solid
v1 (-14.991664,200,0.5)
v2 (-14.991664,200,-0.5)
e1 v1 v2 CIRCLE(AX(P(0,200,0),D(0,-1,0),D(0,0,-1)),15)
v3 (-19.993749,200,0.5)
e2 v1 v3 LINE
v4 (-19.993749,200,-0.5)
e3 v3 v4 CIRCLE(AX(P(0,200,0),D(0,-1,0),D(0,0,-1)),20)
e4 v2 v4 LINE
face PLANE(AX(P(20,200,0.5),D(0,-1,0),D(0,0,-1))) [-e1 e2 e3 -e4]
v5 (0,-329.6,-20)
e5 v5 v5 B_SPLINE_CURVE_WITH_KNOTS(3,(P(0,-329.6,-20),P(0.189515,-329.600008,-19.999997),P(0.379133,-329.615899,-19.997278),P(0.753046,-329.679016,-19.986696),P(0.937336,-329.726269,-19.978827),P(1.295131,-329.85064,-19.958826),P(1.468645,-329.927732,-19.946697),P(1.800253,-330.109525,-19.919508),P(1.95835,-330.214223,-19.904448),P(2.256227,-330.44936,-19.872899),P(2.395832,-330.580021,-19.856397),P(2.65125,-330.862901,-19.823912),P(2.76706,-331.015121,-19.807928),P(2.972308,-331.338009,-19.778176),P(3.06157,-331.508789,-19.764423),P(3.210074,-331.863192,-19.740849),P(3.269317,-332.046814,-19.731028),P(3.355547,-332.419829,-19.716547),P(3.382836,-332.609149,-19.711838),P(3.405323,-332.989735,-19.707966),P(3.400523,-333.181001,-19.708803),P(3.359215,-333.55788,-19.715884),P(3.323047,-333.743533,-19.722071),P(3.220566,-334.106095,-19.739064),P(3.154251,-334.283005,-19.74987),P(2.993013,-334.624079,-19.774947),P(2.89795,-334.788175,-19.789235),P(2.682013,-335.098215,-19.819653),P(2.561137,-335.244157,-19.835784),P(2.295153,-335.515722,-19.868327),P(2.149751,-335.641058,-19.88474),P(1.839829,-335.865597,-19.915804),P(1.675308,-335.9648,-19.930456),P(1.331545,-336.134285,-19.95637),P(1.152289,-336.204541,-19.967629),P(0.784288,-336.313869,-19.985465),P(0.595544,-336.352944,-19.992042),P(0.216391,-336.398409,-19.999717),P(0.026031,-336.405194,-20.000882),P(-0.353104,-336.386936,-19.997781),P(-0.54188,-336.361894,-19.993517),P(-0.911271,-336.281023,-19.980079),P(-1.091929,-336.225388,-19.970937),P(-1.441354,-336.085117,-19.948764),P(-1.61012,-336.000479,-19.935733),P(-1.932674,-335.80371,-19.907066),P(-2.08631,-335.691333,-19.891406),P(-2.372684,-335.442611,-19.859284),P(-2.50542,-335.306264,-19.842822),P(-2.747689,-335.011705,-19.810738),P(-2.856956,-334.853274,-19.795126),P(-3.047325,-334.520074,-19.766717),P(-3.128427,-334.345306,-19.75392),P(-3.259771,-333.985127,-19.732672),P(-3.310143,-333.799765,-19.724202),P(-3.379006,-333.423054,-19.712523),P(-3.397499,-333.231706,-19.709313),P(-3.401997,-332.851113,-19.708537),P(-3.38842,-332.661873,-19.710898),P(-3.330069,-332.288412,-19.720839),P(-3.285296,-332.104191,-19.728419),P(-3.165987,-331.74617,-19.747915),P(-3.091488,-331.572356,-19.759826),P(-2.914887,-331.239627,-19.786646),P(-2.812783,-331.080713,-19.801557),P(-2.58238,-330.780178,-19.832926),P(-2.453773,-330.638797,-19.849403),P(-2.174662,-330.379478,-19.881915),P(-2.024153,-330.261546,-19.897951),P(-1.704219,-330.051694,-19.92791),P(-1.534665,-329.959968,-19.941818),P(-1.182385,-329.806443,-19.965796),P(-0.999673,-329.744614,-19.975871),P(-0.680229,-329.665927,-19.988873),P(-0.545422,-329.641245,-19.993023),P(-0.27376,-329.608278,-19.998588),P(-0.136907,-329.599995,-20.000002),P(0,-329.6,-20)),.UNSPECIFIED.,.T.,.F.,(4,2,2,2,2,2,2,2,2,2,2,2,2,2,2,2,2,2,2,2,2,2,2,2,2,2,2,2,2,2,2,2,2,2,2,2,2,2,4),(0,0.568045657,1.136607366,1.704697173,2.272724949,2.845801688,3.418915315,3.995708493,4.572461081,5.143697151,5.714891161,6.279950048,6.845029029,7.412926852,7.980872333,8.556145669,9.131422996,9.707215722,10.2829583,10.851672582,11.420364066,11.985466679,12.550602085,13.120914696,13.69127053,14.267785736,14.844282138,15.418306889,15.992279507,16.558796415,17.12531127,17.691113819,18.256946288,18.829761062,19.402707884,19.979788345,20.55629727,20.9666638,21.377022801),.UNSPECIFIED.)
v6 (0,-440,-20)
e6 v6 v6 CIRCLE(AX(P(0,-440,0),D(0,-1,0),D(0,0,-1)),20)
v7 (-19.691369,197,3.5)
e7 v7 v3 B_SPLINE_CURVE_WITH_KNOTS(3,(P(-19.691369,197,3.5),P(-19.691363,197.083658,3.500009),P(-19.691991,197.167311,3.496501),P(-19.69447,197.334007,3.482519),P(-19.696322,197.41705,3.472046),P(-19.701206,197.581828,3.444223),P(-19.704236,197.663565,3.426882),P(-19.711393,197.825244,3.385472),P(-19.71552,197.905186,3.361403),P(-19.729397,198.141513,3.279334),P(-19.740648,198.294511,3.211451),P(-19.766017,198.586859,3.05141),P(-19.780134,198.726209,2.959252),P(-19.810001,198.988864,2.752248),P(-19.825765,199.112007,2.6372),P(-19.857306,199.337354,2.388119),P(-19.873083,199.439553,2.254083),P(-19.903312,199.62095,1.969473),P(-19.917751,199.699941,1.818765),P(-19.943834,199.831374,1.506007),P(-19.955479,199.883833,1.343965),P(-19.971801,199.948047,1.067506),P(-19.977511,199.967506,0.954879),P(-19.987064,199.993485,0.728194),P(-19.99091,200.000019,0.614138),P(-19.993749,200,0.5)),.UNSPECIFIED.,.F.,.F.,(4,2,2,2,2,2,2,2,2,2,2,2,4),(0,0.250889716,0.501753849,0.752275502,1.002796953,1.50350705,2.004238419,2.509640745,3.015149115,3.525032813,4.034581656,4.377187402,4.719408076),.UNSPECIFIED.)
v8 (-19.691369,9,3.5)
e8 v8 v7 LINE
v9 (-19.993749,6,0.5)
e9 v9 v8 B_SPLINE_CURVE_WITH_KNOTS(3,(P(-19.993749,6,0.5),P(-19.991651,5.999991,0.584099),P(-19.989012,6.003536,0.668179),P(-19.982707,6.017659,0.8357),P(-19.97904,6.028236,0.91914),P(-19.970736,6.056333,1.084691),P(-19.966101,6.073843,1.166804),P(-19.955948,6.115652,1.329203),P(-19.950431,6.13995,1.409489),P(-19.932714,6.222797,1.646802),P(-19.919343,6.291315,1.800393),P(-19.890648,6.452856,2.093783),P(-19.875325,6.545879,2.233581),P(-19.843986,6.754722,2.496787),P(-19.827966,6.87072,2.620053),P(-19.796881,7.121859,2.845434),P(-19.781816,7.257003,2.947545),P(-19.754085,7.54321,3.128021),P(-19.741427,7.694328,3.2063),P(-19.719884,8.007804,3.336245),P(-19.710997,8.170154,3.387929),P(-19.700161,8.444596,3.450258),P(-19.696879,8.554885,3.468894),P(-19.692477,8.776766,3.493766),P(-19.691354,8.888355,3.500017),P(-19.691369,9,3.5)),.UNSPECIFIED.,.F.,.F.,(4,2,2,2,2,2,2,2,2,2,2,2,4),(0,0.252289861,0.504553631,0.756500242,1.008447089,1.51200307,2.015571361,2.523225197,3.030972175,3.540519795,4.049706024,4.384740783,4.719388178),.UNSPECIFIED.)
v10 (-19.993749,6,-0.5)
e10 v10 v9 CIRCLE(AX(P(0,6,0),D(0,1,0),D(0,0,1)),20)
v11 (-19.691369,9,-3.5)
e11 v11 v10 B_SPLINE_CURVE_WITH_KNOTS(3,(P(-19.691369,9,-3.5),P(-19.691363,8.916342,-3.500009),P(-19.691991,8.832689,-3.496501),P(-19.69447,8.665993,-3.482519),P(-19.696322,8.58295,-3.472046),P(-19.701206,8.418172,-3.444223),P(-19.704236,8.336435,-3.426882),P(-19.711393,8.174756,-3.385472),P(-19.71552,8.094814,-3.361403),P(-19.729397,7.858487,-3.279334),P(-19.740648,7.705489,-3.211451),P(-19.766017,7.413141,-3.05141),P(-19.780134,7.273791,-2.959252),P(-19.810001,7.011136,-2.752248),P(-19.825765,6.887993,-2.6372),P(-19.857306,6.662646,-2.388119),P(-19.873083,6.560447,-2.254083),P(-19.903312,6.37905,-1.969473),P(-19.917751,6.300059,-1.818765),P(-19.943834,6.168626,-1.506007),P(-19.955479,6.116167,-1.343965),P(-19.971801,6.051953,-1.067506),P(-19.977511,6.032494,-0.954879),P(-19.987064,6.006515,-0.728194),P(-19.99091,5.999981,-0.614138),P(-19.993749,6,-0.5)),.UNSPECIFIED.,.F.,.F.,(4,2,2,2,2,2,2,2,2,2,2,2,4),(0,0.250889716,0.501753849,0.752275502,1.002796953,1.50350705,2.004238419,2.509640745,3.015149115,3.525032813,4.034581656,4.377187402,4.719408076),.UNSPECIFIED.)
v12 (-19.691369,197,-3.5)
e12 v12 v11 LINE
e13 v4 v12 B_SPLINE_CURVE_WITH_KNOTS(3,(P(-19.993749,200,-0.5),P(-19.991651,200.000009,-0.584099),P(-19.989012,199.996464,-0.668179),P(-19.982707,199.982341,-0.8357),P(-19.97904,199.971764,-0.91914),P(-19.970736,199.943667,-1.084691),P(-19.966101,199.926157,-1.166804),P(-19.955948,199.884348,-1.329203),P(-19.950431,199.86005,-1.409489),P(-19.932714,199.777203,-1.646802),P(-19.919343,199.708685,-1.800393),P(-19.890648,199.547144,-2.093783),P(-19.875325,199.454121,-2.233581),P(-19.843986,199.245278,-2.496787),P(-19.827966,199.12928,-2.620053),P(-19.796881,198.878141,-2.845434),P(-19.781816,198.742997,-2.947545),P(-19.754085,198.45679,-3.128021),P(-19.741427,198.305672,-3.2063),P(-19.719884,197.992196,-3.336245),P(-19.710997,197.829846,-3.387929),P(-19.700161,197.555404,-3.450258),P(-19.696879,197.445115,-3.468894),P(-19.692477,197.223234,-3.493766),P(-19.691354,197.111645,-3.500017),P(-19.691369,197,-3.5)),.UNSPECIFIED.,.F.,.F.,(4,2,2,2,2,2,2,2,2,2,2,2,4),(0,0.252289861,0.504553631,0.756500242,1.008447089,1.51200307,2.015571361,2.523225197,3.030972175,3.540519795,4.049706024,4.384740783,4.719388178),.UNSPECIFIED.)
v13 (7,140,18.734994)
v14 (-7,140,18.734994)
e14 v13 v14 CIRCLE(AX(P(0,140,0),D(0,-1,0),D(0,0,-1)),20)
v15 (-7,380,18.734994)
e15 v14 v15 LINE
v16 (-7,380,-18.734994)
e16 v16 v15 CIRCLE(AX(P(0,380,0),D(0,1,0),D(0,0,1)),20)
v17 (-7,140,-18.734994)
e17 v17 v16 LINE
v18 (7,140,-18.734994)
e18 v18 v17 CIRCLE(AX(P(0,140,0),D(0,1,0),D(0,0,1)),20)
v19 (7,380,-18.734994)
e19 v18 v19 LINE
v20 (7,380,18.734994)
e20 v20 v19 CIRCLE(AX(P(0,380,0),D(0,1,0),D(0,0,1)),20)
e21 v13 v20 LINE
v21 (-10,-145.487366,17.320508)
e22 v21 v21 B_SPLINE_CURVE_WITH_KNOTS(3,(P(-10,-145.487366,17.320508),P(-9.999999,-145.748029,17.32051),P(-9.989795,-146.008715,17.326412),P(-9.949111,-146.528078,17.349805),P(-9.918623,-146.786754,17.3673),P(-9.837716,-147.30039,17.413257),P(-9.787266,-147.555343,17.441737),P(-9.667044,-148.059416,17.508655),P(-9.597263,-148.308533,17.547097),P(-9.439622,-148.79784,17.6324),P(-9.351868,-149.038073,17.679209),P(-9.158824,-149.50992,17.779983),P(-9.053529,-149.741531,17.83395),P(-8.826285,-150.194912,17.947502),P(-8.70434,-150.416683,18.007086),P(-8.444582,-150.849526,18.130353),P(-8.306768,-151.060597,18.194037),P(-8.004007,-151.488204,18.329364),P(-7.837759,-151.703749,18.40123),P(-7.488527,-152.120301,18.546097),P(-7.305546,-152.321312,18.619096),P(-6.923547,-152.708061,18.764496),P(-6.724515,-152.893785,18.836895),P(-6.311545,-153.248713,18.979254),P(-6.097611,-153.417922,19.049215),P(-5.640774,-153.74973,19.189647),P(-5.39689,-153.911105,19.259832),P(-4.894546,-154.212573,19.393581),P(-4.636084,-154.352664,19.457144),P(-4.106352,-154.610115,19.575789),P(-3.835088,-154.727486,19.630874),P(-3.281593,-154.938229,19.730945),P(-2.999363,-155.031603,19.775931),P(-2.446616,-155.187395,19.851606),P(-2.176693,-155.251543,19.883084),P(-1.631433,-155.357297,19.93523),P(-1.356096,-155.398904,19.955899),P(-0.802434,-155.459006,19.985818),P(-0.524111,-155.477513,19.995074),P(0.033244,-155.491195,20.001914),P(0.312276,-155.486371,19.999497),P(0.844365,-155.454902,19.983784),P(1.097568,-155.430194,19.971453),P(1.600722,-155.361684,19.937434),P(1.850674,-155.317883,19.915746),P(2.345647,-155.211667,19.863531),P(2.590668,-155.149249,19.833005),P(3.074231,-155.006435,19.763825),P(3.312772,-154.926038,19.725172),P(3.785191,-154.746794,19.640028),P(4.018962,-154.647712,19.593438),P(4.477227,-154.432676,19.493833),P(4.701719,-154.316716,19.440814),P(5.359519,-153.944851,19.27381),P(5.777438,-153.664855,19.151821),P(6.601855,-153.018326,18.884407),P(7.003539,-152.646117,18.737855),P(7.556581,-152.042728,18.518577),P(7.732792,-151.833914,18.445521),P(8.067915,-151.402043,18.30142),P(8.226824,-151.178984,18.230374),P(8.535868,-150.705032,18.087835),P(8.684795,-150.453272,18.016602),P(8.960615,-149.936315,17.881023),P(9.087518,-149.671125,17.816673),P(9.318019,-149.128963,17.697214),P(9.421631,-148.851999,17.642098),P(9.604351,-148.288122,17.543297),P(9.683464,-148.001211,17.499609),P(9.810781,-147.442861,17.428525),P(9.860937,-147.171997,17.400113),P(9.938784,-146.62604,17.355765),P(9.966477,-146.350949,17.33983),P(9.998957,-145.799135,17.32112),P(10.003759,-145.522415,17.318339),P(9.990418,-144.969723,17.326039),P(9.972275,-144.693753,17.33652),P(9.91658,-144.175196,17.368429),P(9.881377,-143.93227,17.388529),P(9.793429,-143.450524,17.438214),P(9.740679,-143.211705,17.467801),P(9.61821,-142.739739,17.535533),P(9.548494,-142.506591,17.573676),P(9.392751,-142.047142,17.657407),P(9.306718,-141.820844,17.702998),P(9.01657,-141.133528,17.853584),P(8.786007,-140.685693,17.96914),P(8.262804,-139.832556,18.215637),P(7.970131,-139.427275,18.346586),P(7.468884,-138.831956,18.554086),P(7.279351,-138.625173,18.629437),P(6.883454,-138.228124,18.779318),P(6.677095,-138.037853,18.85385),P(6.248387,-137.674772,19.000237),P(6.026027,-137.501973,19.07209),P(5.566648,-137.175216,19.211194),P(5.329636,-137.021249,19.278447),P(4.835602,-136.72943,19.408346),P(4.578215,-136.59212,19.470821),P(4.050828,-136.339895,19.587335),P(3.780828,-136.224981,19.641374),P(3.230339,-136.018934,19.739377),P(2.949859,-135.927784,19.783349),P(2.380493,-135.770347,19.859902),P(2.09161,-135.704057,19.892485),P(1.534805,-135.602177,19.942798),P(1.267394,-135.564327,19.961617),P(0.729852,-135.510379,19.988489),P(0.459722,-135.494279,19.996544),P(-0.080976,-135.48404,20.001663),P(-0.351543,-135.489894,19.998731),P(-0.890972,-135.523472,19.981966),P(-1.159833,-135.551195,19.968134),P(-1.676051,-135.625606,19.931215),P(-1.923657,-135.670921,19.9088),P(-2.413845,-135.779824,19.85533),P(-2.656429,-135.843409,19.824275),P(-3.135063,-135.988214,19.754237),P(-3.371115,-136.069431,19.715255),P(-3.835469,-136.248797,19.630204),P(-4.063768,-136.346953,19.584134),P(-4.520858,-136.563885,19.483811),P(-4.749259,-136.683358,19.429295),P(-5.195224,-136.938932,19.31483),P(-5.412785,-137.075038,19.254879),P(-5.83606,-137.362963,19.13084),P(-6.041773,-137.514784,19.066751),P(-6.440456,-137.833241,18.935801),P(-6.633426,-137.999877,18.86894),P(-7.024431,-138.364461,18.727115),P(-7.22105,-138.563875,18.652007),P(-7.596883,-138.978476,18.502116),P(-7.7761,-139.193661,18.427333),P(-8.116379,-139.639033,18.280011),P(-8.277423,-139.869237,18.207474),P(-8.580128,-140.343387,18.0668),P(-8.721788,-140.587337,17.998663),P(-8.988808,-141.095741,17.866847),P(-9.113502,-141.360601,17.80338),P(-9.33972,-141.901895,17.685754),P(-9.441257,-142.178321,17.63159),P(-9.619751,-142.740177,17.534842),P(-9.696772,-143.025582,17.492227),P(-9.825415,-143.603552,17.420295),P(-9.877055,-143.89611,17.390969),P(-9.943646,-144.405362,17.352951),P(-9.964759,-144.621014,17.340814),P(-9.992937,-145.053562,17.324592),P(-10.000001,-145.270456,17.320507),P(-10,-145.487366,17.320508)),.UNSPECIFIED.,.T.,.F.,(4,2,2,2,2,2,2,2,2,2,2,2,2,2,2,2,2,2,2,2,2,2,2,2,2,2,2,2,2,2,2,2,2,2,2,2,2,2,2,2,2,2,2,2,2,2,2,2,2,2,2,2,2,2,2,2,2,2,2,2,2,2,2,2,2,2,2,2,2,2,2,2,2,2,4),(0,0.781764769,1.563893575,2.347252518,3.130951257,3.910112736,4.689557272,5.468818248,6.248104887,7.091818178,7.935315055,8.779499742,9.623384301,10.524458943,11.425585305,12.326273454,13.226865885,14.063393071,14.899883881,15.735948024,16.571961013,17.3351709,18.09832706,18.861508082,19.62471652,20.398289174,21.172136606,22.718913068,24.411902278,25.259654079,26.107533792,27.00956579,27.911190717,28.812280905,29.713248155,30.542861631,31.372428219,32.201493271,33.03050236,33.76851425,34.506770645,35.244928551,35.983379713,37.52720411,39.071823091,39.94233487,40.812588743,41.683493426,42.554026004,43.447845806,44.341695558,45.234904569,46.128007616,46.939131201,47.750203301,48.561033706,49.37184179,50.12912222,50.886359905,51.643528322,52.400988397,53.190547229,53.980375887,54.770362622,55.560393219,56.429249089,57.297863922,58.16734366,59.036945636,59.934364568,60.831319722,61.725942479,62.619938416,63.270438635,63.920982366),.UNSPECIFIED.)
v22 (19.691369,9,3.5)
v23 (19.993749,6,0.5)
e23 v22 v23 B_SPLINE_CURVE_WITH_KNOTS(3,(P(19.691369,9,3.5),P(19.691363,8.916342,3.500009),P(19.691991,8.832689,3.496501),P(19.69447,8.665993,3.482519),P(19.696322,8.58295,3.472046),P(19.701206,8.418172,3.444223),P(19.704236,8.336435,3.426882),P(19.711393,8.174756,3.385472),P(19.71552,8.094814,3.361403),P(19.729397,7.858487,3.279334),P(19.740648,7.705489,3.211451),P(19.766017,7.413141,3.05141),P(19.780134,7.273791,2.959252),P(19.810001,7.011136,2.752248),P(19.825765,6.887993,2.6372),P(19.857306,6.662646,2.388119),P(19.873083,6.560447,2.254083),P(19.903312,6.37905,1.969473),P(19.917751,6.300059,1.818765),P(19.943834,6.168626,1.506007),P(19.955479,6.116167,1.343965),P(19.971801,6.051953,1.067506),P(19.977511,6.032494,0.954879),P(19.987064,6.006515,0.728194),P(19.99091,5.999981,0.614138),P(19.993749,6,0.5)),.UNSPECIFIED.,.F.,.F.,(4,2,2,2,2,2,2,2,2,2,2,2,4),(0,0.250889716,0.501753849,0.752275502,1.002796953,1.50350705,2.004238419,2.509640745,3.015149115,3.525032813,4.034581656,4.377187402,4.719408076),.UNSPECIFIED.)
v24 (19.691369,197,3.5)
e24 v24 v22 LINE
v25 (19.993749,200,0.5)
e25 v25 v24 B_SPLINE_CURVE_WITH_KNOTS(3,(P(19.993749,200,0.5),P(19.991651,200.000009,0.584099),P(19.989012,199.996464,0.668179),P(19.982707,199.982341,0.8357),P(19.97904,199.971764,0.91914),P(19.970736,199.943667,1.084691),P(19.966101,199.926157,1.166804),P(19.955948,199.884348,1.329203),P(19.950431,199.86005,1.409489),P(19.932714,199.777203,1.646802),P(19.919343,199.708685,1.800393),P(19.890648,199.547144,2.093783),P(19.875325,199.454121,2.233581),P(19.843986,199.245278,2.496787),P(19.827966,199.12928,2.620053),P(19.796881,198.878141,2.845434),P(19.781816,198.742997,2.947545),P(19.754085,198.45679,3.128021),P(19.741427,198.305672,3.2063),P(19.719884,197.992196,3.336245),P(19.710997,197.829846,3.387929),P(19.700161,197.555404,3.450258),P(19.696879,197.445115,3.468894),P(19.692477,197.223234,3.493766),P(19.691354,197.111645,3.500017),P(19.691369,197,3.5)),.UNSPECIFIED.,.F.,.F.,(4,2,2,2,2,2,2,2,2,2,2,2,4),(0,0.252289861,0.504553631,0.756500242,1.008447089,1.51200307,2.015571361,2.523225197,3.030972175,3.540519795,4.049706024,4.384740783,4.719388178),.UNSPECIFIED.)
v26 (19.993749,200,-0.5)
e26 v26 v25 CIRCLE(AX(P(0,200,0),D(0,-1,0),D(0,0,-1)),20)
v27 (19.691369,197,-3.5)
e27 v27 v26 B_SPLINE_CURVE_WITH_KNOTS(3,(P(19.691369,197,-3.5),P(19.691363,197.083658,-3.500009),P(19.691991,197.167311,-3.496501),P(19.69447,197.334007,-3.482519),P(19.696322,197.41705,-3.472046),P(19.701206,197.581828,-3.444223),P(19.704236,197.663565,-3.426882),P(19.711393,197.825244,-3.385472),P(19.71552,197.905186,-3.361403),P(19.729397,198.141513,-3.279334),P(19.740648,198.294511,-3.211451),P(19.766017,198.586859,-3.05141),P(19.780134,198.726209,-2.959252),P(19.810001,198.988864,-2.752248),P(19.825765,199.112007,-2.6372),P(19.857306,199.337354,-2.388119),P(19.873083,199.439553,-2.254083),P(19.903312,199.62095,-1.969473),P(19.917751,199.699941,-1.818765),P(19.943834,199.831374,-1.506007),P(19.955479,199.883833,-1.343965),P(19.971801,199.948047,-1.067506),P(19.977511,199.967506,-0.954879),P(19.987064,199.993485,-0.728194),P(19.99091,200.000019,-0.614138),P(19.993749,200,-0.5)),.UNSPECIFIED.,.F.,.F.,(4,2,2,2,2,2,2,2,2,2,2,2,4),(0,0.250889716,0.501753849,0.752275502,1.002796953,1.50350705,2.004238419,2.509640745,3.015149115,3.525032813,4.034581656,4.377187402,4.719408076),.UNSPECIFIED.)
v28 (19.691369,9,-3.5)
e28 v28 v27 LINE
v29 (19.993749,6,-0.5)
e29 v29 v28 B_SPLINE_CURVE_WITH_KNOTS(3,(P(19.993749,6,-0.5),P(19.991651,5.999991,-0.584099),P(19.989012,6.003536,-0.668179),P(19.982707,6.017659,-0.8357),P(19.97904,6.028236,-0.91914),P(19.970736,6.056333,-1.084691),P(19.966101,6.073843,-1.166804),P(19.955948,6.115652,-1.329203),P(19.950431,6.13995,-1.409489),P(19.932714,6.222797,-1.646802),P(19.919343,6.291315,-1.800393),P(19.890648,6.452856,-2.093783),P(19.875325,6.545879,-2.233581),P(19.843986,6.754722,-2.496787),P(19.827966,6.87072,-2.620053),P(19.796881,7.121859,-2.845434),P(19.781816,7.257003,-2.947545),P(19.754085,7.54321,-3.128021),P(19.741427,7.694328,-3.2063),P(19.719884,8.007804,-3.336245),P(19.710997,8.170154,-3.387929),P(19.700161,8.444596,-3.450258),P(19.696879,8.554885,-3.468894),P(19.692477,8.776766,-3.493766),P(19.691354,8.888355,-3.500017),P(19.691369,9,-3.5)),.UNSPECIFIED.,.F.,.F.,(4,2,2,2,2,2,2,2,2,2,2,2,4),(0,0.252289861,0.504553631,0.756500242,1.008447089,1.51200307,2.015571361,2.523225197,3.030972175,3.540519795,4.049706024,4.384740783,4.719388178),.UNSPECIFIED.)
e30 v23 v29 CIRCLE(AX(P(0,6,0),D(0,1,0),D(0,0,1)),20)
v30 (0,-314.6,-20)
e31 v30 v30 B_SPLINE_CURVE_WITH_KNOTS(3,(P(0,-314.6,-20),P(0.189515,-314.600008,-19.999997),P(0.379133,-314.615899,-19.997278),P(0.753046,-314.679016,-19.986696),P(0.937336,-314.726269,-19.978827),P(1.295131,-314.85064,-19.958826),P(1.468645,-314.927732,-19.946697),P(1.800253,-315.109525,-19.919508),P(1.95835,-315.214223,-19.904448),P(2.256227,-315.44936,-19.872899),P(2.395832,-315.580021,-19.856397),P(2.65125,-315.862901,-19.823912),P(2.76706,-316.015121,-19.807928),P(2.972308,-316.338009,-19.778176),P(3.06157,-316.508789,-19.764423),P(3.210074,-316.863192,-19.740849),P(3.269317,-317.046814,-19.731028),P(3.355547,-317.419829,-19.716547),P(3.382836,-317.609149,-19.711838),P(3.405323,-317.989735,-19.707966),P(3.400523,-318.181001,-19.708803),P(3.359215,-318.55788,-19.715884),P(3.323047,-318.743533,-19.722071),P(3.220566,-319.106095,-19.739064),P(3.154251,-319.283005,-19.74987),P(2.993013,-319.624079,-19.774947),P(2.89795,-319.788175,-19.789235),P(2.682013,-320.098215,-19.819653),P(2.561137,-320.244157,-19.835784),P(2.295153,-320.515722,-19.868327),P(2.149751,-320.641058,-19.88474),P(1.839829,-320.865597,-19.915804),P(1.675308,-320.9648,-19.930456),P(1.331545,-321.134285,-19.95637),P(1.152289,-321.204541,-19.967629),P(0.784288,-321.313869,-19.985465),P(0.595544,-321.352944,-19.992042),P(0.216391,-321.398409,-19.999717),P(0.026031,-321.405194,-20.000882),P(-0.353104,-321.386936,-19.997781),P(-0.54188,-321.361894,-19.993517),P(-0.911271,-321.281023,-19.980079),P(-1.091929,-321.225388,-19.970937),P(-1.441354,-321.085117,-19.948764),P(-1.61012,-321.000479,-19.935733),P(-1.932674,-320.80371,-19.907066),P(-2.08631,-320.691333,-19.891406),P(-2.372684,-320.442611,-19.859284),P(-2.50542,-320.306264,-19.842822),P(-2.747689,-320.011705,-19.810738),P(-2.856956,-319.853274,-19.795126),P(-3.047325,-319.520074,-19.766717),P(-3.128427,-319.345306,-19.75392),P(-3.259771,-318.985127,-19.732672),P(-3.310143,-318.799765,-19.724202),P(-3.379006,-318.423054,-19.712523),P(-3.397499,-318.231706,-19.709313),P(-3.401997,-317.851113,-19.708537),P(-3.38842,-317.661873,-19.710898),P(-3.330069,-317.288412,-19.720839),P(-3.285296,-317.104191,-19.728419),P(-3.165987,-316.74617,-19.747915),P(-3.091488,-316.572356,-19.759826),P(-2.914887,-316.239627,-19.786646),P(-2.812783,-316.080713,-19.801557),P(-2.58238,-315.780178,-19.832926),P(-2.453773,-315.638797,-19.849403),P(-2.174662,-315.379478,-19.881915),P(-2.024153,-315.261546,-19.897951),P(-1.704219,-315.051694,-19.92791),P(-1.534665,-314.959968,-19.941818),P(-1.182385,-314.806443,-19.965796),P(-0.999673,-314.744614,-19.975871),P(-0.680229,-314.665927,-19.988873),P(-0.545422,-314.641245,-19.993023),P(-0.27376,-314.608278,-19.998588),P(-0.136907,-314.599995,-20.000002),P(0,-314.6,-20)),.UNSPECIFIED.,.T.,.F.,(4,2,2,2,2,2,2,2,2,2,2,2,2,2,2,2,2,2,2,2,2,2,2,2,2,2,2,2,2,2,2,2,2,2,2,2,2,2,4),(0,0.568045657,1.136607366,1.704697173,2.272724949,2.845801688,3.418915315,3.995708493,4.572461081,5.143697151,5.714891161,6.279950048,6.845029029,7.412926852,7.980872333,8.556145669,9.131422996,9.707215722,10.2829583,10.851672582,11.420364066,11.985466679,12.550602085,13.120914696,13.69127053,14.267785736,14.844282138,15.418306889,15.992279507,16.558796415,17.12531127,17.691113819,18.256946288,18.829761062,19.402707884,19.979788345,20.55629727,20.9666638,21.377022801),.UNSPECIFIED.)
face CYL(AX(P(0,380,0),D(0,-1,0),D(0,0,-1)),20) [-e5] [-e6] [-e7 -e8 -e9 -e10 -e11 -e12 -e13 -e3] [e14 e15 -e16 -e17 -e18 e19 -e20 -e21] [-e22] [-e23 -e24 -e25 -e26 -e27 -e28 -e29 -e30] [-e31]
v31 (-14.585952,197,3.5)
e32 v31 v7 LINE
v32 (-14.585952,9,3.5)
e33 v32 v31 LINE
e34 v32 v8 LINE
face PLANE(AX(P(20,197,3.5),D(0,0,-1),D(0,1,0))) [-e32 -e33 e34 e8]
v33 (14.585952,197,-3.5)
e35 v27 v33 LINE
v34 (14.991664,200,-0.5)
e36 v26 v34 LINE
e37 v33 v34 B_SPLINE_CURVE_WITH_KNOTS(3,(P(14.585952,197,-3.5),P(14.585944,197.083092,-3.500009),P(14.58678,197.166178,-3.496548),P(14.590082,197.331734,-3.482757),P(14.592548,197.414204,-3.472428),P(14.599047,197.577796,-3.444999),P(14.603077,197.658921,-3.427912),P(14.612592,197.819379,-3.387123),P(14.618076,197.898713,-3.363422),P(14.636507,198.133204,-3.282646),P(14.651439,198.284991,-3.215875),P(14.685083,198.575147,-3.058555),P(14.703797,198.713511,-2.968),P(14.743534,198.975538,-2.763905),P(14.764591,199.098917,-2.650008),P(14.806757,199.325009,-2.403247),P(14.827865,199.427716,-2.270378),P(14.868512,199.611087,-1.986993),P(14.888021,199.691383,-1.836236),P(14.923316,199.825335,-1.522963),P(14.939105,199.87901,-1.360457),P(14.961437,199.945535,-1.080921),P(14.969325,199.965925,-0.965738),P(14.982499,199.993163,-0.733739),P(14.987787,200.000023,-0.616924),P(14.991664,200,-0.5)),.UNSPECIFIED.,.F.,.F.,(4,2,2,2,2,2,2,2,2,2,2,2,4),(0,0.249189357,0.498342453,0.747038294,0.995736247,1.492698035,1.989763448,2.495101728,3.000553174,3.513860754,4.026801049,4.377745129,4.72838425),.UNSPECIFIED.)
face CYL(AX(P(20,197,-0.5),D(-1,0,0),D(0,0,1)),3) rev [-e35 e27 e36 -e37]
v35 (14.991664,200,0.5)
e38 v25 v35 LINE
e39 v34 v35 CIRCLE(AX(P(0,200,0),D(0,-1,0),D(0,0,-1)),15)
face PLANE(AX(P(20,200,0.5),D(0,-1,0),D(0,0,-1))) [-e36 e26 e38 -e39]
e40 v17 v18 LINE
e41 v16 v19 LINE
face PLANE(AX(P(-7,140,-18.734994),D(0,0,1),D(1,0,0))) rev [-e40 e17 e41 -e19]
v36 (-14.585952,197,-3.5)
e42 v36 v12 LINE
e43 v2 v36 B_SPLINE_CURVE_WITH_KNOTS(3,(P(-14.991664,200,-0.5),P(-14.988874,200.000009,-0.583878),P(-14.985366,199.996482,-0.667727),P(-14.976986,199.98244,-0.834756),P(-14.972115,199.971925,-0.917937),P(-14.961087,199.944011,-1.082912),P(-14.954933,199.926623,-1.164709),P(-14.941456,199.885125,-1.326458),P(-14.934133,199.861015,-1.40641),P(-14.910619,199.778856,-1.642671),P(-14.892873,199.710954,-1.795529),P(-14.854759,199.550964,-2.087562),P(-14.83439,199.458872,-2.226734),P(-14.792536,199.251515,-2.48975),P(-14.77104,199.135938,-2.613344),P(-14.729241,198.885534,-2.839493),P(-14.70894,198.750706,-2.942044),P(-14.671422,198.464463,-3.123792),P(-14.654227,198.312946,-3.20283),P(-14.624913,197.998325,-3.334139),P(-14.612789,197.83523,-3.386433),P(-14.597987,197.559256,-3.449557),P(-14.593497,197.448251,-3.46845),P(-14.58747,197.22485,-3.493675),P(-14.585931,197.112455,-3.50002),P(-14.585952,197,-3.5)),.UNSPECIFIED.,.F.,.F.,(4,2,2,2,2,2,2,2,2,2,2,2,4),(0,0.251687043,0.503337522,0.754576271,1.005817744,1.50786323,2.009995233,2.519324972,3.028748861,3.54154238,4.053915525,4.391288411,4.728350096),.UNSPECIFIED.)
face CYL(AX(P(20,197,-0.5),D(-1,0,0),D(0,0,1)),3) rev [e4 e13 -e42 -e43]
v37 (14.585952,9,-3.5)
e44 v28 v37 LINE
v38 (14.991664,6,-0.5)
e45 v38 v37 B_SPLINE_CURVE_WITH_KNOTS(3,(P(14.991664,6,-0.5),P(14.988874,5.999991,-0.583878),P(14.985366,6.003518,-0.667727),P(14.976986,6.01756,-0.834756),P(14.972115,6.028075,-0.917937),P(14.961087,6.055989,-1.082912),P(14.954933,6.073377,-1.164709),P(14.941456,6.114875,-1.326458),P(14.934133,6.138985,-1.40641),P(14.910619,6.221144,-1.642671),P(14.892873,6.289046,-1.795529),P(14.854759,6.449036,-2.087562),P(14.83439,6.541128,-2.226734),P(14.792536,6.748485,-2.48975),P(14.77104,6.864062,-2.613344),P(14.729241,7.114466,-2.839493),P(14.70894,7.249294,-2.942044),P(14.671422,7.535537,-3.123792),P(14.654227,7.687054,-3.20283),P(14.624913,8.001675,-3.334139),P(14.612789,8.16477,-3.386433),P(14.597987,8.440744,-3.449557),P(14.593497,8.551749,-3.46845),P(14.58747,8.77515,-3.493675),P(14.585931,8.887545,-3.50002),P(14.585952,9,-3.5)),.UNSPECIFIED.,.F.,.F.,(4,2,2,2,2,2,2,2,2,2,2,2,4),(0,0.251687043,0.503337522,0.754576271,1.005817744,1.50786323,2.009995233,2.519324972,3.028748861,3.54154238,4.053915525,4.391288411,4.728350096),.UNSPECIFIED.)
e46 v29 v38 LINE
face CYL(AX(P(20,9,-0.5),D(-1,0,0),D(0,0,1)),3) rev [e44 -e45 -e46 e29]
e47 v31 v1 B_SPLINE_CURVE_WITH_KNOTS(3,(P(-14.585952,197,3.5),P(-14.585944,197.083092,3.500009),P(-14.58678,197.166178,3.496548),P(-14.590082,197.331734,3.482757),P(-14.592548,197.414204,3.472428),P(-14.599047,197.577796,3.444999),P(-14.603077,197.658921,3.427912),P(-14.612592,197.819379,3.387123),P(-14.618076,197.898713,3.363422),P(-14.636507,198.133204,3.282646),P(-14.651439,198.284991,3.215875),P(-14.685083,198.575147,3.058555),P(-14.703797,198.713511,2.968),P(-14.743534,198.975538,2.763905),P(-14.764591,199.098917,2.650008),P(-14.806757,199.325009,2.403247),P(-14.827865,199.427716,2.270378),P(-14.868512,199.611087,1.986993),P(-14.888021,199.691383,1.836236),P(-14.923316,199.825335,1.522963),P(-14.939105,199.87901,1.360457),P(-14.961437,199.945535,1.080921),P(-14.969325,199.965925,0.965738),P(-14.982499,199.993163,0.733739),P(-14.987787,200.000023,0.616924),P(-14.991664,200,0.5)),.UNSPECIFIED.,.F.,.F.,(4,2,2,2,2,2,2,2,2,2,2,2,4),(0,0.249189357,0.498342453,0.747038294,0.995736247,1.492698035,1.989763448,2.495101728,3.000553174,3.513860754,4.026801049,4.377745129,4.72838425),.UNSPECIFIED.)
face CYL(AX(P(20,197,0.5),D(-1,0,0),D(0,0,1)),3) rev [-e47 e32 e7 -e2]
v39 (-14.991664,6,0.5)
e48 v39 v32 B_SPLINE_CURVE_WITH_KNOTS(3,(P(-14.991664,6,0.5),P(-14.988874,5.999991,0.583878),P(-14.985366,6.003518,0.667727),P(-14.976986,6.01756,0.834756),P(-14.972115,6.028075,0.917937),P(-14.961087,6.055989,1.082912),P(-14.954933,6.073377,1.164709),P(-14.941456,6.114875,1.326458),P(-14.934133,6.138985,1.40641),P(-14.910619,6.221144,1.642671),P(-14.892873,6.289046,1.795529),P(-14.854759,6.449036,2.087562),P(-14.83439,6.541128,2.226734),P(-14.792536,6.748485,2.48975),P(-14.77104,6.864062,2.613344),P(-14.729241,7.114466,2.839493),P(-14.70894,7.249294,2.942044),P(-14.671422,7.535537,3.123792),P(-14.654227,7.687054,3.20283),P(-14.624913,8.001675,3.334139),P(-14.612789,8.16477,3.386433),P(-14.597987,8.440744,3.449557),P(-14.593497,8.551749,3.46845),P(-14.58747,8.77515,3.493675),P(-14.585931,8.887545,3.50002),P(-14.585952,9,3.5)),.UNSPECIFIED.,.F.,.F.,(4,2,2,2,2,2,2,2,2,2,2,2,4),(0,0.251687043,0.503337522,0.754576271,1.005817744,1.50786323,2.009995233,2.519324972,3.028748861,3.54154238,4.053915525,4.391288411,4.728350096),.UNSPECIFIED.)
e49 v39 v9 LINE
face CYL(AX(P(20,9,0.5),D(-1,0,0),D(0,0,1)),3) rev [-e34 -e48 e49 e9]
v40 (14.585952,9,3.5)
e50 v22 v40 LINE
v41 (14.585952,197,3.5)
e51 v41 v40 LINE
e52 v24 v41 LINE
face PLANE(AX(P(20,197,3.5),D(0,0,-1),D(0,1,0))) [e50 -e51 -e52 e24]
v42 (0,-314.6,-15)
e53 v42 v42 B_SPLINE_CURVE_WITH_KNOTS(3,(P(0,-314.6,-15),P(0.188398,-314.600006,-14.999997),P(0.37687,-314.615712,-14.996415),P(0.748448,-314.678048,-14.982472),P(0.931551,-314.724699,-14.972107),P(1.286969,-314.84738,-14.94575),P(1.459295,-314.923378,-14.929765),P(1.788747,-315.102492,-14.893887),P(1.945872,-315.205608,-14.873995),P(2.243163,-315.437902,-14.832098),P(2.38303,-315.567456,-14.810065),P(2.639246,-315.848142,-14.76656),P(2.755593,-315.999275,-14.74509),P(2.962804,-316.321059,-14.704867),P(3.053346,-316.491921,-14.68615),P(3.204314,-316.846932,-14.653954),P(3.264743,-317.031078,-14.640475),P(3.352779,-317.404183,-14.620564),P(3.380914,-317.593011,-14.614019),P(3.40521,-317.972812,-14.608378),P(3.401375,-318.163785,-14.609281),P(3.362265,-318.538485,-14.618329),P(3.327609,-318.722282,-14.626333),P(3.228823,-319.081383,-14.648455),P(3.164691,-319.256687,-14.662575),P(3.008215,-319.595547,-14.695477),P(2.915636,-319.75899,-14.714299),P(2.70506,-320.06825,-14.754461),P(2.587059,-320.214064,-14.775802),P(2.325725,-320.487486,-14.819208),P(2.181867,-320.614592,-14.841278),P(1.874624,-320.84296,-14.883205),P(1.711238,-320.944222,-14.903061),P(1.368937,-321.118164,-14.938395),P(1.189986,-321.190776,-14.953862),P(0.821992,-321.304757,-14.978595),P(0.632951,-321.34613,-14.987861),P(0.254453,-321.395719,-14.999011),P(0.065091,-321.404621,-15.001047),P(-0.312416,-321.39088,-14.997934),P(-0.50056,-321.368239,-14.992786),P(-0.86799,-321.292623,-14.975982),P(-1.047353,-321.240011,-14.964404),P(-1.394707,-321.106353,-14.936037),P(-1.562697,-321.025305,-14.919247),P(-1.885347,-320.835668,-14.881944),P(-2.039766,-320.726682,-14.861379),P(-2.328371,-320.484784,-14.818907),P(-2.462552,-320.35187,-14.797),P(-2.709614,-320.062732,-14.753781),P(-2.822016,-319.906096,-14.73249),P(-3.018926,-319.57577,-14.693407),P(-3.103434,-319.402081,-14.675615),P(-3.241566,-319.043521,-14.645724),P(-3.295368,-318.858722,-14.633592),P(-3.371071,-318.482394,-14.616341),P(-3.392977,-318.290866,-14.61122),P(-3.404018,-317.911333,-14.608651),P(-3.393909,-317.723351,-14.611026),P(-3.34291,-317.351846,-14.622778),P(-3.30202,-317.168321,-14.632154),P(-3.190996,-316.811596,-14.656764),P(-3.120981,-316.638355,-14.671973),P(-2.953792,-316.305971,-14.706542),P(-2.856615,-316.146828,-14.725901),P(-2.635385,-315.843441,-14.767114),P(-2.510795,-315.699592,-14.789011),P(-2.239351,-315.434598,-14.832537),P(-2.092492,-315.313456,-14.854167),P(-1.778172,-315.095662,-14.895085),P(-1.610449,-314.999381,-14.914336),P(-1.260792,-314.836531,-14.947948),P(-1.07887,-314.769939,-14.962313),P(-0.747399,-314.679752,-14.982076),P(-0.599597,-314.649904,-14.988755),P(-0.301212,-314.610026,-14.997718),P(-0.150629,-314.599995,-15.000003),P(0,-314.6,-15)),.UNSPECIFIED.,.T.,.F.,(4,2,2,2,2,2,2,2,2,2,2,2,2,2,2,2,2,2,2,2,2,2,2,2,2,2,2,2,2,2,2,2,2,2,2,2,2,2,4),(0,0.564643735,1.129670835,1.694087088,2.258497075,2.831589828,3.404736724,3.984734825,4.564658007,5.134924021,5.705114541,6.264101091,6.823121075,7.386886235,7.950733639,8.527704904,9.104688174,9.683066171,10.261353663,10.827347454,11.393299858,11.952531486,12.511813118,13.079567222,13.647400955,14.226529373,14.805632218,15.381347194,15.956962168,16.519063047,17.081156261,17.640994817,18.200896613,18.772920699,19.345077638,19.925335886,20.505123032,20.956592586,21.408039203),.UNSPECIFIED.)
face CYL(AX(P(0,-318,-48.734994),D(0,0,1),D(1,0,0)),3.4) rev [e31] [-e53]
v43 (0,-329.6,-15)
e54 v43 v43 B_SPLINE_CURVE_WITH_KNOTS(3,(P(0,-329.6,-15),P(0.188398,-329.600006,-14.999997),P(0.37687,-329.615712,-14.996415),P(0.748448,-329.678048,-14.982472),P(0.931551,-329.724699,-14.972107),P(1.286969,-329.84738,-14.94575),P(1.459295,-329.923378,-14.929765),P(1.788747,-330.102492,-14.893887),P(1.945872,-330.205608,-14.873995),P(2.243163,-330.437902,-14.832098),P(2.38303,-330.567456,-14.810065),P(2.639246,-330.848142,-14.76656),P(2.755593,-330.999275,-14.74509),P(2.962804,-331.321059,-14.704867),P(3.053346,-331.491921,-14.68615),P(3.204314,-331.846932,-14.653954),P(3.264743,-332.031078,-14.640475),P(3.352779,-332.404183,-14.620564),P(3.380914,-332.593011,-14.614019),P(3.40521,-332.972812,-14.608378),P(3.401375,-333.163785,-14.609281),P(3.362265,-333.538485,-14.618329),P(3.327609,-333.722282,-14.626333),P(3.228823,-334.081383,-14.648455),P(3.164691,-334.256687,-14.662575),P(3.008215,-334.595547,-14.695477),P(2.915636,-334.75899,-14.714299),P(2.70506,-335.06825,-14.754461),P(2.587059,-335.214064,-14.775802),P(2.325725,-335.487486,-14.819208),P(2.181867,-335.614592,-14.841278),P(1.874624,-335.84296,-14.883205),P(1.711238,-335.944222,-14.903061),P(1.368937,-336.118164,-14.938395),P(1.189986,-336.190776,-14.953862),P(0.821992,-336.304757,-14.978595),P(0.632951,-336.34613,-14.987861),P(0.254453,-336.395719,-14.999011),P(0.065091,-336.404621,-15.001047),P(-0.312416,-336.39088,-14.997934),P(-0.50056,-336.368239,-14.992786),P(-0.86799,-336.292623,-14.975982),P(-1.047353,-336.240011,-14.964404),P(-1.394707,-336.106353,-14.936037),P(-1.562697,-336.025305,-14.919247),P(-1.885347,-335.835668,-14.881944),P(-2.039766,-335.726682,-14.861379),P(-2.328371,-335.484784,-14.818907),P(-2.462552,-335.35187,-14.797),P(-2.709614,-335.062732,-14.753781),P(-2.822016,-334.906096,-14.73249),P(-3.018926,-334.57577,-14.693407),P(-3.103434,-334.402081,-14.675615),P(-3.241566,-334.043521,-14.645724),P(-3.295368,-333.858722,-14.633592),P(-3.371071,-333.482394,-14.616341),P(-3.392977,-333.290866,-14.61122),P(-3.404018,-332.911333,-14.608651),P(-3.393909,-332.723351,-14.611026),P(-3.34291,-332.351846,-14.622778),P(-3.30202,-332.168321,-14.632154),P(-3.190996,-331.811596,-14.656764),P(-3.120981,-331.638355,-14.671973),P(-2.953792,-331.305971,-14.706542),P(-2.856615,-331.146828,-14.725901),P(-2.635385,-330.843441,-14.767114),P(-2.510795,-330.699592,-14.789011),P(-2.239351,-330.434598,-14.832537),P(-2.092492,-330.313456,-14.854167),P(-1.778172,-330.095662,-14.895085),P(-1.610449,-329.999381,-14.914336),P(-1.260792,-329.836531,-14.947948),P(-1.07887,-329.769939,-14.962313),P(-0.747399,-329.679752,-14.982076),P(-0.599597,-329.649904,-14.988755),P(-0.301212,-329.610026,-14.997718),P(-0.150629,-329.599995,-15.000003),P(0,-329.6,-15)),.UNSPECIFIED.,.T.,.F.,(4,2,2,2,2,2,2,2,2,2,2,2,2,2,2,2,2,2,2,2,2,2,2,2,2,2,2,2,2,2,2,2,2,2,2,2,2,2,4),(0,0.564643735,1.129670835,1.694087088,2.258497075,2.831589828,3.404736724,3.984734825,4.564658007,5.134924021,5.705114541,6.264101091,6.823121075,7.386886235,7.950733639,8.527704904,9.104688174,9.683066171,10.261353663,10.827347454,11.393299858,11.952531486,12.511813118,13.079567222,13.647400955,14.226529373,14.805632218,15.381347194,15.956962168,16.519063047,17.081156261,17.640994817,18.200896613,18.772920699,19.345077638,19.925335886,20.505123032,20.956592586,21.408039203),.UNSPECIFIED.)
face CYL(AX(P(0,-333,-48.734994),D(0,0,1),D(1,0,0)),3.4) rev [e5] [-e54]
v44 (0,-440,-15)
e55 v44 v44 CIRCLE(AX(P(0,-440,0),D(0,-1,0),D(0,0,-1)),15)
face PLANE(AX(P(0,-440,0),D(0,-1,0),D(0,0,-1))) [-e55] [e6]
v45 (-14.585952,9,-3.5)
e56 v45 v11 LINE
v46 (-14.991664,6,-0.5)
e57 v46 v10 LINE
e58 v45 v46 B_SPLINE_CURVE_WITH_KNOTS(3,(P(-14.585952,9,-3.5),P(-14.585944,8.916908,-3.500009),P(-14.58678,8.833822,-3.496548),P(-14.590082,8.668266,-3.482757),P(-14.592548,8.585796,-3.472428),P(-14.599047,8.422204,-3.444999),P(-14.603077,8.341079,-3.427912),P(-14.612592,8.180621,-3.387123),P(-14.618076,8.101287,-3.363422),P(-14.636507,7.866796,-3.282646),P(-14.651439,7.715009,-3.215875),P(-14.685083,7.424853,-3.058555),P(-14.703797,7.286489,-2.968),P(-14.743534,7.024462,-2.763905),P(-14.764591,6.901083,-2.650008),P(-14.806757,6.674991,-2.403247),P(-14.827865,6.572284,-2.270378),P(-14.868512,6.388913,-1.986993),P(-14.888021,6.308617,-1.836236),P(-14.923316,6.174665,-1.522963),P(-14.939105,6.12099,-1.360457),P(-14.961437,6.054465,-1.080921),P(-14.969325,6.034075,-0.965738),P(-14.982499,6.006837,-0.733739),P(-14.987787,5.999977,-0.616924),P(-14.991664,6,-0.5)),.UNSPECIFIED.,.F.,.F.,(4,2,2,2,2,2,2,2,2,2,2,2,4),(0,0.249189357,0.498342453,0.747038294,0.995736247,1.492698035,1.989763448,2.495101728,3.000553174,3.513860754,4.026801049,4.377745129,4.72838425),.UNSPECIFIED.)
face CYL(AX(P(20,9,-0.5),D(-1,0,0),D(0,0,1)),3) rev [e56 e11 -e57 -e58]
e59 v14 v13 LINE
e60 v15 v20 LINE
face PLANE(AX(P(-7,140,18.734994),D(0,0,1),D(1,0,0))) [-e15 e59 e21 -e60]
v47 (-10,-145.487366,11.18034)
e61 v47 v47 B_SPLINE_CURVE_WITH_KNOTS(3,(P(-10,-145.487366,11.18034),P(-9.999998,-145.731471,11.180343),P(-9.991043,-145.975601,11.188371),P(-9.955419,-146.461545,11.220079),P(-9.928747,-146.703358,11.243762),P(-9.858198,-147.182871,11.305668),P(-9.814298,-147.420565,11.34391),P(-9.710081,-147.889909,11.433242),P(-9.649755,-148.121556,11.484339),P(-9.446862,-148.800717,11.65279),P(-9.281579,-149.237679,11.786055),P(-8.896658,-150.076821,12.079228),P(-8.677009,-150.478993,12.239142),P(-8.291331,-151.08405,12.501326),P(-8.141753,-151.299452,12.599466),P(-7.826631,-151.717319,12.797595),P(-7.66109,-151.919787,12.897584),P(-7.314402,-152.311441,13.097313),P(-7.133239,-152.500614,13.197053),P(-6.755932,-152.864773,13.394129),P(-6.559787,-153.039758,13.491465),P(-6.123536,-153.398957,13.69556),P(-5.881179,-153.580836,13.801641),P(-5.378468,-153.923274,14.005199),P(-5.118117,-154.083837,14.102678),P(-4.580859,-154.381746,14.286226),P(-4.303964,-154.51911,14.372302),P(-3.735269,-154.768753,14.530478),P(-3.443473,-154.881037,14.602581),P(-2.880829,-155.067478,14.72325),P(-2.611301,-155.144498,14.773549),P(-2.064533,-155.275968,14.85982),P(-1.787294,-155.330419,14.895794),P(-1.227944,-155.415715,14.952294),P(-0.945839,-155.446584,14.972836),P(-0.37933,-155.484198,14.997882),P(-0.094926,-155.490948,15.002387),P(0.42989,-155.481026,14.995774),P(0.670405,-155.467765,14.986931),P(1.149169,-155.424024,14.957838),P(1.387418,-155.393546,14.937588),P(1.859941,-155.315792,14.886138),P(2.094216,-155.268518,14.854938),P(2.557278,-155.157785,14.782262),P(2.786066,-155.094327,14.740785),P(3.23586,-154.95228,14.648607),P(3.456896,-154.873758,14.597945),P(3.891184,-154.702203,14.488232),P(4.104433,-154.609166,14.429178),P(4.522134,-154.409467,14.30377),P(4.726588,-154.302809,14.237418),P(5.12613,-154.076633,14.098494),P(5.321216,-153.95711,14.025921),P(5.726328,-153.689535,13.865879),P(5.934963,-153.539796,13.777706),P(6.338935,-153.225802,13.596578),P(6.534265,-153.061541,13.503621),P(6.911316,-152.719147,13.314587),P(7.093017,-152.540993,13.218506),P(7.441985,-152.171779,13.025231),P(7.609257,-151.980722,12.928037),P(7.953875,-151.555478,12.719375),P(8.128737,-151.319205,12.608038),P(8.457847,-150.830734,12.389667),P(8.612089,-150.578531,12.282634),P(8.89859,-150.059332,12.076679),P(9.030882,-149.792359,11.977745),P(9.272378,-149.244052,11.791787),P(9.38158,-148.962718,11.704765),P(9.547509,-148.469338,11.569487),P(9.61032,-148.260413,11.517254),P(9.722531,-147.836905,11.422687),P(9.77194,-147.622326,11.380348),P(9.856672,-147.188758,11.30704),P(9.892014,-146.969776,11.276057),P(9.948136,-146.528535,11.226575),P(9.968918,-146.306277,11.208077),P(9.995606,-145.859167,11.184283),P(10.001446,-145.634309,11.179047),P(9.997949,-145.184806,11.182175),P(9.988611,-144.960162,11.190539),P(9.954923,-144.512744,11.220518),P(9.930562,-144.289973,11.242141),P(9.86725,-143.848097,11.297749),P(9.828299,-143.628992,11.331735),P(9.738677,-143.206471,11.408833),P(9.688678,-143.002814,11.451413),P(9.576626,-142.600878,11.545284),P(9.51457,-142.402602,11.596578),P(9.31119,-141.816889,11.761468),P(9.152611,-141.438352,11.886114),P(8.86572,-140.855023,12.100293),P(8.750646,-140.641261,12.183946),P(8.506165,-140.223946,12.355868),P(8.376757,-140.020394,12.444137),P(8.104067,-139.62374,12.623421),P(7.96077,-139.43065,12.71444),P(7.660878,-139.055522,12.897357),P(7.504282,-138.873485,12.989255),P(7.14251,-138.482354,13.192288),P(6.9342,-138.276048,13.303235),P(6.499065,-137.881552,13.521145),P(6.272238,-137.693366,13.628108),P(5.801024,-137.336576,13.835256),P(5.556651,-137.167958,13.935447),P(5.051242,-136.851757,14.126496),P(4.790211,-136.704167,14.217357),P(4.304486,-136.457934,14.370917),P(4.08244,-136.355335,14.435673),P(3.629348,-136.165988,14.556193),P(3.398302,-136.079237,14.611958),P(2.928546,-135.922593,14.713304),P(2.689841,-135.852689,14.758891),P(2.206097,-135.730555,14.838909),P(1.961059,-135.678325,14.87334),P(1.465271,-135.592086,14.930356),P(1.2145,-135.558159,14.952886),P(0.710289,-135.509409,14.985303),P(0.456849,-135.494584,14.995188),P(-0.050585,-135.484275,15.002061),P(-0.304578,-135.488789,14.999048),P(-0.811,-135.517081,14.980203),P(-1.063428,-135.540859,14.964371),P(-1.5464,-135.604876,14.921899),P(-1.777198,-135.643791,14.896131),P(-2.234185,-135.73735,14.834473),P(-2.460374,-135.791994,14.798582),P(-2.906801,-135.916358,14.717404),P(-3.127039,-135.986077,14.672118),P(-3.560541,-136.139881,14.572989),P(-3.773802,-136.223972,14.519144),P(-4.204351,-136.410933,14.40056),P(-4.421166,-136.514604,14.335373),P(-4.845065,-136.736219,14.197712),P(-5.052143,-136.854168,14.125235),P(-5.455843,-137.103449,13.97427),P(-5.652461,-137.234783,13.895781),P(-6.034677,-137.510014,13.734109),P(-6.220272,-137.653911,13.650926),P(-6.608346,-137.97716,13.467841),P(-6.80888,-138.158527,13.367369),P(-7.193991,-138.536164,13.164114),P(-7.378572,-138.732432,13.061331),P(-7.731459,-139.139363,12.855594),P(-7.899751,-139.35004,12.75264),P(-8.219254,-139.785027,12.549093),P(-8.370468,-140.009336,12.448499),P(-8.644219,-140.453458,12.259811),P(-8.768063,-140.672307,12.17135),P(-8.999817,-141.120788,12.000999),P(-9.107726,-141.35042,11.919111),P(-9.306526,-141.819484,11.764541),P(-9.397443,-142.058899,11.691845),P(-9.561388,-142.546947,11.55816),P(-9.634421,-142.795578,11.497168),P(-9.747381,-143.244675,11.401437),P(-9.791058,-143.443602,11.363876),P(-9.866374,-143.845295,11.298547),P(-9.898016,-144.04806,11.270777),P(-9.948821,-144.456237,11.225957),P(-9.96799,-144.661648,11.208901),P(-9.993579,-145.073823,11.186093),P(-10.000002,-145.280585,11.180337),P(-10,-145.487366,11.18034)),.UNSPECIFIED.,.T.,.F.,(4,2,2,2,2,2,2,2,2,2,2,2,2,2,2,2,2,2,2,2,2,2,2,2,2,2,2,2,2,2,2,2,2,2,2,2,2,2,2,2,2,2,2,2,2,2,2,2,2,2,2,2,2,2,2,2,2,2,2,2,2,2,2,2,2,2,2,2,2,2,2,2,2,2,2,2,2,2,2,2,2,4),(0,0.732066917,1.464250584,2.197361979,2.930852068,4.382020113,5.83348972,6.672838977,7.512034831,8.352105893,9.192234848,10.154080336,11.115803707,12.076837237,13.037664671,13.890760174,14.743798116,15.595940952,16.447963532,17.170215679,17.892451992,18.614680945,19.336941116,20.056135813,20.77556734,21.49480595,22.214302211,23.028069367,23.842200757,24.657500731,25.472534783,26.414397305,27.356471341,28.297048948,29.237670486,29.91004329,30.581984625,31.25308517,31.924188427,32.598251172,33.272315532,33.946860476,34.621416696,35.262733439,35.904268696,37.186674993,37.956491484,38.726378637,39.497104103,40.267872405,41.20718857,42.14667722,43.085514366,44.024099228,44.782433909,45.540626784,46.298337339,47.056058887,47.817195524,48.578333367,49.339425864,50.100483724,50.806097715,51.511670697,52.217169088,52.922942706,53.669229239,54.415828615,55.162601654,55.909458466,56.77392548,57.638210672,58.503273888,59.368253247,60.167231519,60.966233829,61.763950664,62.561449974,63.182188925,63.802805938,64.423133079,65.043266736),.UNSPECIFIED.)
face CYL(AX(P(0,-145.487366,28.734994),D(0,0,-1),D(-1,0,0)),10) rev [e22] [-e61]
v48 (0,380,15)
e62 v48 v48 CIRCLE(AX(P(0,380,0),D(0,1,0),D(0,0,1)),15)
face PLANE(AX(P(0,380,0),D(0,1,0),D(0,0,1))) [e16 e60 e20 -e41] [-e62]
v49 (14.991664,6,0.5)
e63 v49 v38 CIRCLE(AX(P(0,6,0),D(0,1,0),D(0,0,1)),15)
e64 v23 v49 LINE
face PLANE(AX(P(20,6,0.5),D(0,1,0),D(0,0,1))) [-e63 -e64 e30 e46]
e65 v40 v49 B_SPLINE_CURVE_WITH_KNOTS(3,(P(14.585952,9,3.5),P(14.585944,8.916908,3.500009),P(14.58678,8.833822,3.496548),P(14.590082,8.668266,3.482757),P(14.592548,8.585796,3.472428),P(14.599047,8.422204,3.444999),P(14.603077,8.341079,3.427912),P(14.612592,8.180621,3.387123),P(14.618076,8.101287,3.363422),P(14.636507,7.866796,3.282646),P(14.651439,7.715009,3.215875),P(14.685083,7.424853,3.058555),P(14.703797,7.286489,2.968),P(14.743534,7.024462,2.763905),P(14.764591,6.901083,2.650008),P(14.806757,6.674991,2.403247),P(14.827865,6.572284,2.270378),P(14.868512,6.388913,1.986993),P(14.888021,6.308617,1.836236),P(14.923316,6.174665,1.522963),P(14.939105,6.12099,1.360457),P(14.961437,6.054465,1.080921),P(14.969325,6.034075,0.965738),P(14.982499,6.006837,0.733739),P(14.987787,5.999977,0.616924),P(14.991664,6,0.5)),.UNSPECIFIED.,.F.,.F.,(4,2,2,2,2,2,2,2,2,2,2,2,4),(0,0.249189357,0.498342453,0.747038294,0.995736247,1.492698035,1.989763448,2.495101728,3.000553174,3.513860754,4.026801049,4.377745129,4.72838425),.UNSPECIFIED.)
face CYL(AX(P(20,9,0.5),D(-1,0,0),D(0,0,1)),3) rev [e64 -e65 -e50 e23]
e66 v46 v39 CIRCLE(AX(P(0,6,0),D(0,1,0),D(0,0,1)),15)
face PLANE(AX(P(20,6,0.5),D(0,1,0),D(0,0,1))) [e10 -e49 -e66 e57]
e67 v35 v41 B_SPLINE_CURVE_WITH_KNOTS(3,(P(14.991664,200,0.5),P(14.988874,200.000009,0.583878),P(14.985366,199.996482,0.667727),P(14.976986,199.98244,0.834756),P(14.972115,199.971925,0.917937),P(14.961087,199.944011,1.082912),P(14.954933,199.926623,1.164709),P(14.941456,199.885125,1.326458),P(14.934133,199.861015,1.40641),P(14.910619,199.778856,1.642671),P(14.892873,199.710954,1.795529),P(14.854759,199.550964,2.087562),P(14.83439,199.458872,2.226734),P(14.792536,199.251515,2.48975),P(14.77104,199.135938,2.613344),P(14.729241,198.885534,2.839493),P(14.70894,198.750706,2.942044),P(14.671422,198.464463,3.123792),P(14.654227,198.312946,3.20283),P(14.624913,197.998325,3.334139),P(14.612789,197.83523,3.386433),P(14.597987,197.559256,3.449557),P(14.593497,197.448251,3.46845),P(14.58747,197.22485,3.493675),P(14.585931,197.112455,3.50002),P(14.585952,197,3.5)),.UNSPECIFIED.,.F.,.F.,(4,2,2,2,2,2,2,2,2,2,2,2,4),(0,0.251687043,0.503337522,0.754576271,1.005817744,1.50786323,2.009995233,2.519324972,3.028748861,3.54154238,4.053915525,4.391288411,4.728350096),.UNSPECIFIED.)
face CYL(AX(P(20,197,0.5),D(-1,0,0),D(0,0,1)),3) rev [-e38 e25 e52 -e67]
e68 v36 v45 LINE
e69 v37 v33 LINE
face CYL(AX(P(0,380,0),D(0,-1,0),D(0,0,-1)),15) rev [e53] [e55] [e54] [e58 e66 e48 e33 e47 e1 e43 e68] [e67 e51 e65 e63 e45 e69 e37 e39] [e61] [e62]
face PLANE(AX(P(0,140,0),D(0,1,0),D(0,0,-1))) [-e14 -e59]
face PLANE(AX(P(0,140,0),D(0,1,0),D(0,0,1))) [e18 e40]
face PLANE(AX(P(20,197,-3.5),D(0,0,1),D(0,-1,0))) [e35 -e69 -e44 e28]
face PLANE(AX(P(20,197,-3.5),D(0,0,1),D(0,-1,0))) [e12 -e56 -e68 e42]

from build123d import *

# Parameters (mm, degrees)
SKETCH1_R                = 20
SKETCH1_R_2              = 15
BOSS_EXTRUDE1_DEPTH      = 380
SKETCH8_R                = 20
BOSS_EXTRUDE3_DEPTH      = 60
CUT_EXTRUDE2_START       = -899.5
SKETCH9_R                = 15
CUT_EXTRUDE2_DEPTH       = 899.5
CUT_EXTRUDE16_DEPTH      = 240
CUT_EXTRUDE17_DEPTH      = 20
CUT_EXTRUDE17_DEPTH_BACK = 20
CUT_EXTRUDE19_DEPTH      = 10
CUT_EXTRUDE19_DEPTH_BACK = 10
SKETCH26_R               = 10
CUT_EXTRUDE20_DEPTH      = 30
CUT_EXTRUDE20_DEPTH_BACK = 20
SKETCH27_R               = 3.4


with BuildPart() as part:
    # Sketch1 → Boss-Extrude1 (new, symmetric)
    with BuildSketch(Plane(origin=(0, 0, 0), x_dir=(1, 0, 0), z_dir=(0, 1, 0))):
        Circle(SKETCH1_R)
        Circle(SKETCH1_R_2, mode=Mode.SUBTRACT)
    extrude(amount=BOSS_EXTRUDE1_DEPTH, both=True)

    # Sketch8 → Boss-Extrude3 (add)
    with BuildSketch(Plane.XZ.offset(380)):
        Circle(SKETCH8_R)
    extrude(amount=BOSS_EXTRUDE3_DEPTH)

    # Sketch9 → Cut-Extrude2 (cut)
    with BuildSketch(Plane(origin=(-32.302786122, 416.289190775, -45.221901395), x_dir=(-0.9768887275019512, 0, 0.2137484832217963), z_dir=(0, 1, 0)).offset(CUT_EXTRUDE2_START)):
        with Locations((-21.890114798, 51.081437247)):
            Circle(SKETCH9_R)
    extrude(amount=CUT_EXTRUDE2_DEPTH, mode=Mode.SUBTRACT)

    # Sketch23 → Cut-Extrude16 (cut)
    with BuildSketch(Plane(origin=(0, 380, 0), x_dir=(1, 0, 0), z_dir=(0, 1, 0))):
        with BuildLine():
            Line((-7, 18.734993995), (7, 18.734993995))
            ThreePointArc((7, 18.734993995), (0, 20), (-7, 18.734993995))
        make_face()
    cut_extrude16 = extrude(amount=-CUT_EXTRUDE16_DEPTH, mode=Mode.SUBTRACT)

    # Mirror1: Cut-Extrude16 across plane
    add(cut_extrude16.mirror(Plane.XY), mode=Mode.SUBTRACT)

    # Sketch24 → Cut-Extrude17 (cut, two sides: drawn at the far end of the back side and taken through both)
    with BuildSketch(Plane(origin=(0, 0, 0), x_dir=(0, 0, -1), z_dir=(1, 0, 0)).offset(-CUT_EXTRUDE17_DEPTH_BACK)):
        with BuildLine():
            Line((-0.5, 200), (0.5, 200))
            ThreePointArc((0.5, 200), (2.621320344, 199.121320344), (3.5, 197))
            Line((3.5, 197), (3.5, 9))
            ThreePointArc((3.5, 9), (2.621320344, 6.878679656), (0.5, 6))
            Line((0.5, 6), (-0.5, 6))
            ThreePointArc((-0.5, 6), (-2.621320344, 6.878679656), (-3.5, 9))
            Line((-3.5, 9), (-3.5, 197))
            ThreePointArc((-3.5, 197), (-2.621320344, 199.121320344), (-0.5, 200))
        make_face()
    extrude(amount=CUT_EXTRUDE17_DEPTH + CUT_EXTRUDE17_DEPTH_BACK, mode=Mode.SUBTRACT)

    # Sketch26 → Cut-Extrude19 (cut, two sides: drawn at the far end of the back side and taken through both)
    with BuildSketch(Plane(origin=(0, -44.33037899, 18.734993995), x_dir=(1, 0, 0), z_dir=(0, 0, 1)).offset(-CUT_EXTRUDE19_DEPTH_BACK)):
        with Locations((0, -101.15698714)):
            Circle(SKETCH26_R)
    extrude(amount=CUT_EXTRUDE19_DEPTH + CUT_EXTRUDE19_DEPTH_BACK, mode=Mode.SUBTRACT)

    # Sketch27 → Cut-Extrude20 (cut, two sides: drawn at the far end of the back side and taken through both)
    with BuildSketch(Plane(origin=(0, -44.33037899, -18.734993995), x_dir=(-1, 0, 0), z_dir=(0, 0, -1)).offset(-CUT_EXTRUDE20_DEPTH_BACK)):
        with Locations((0, -273.66962101)):
            Circle(SKETCH27_R)
        with Locations((0, -288.66962101)):
            Circle(SKETCH27_R)
    extrude(amount=CUT_EXTRUDE20_DEPTH + CUT_EXTRUDE20_DEPTH_BACK, mode=Mode.SUBTRACT)


solid = part.part
